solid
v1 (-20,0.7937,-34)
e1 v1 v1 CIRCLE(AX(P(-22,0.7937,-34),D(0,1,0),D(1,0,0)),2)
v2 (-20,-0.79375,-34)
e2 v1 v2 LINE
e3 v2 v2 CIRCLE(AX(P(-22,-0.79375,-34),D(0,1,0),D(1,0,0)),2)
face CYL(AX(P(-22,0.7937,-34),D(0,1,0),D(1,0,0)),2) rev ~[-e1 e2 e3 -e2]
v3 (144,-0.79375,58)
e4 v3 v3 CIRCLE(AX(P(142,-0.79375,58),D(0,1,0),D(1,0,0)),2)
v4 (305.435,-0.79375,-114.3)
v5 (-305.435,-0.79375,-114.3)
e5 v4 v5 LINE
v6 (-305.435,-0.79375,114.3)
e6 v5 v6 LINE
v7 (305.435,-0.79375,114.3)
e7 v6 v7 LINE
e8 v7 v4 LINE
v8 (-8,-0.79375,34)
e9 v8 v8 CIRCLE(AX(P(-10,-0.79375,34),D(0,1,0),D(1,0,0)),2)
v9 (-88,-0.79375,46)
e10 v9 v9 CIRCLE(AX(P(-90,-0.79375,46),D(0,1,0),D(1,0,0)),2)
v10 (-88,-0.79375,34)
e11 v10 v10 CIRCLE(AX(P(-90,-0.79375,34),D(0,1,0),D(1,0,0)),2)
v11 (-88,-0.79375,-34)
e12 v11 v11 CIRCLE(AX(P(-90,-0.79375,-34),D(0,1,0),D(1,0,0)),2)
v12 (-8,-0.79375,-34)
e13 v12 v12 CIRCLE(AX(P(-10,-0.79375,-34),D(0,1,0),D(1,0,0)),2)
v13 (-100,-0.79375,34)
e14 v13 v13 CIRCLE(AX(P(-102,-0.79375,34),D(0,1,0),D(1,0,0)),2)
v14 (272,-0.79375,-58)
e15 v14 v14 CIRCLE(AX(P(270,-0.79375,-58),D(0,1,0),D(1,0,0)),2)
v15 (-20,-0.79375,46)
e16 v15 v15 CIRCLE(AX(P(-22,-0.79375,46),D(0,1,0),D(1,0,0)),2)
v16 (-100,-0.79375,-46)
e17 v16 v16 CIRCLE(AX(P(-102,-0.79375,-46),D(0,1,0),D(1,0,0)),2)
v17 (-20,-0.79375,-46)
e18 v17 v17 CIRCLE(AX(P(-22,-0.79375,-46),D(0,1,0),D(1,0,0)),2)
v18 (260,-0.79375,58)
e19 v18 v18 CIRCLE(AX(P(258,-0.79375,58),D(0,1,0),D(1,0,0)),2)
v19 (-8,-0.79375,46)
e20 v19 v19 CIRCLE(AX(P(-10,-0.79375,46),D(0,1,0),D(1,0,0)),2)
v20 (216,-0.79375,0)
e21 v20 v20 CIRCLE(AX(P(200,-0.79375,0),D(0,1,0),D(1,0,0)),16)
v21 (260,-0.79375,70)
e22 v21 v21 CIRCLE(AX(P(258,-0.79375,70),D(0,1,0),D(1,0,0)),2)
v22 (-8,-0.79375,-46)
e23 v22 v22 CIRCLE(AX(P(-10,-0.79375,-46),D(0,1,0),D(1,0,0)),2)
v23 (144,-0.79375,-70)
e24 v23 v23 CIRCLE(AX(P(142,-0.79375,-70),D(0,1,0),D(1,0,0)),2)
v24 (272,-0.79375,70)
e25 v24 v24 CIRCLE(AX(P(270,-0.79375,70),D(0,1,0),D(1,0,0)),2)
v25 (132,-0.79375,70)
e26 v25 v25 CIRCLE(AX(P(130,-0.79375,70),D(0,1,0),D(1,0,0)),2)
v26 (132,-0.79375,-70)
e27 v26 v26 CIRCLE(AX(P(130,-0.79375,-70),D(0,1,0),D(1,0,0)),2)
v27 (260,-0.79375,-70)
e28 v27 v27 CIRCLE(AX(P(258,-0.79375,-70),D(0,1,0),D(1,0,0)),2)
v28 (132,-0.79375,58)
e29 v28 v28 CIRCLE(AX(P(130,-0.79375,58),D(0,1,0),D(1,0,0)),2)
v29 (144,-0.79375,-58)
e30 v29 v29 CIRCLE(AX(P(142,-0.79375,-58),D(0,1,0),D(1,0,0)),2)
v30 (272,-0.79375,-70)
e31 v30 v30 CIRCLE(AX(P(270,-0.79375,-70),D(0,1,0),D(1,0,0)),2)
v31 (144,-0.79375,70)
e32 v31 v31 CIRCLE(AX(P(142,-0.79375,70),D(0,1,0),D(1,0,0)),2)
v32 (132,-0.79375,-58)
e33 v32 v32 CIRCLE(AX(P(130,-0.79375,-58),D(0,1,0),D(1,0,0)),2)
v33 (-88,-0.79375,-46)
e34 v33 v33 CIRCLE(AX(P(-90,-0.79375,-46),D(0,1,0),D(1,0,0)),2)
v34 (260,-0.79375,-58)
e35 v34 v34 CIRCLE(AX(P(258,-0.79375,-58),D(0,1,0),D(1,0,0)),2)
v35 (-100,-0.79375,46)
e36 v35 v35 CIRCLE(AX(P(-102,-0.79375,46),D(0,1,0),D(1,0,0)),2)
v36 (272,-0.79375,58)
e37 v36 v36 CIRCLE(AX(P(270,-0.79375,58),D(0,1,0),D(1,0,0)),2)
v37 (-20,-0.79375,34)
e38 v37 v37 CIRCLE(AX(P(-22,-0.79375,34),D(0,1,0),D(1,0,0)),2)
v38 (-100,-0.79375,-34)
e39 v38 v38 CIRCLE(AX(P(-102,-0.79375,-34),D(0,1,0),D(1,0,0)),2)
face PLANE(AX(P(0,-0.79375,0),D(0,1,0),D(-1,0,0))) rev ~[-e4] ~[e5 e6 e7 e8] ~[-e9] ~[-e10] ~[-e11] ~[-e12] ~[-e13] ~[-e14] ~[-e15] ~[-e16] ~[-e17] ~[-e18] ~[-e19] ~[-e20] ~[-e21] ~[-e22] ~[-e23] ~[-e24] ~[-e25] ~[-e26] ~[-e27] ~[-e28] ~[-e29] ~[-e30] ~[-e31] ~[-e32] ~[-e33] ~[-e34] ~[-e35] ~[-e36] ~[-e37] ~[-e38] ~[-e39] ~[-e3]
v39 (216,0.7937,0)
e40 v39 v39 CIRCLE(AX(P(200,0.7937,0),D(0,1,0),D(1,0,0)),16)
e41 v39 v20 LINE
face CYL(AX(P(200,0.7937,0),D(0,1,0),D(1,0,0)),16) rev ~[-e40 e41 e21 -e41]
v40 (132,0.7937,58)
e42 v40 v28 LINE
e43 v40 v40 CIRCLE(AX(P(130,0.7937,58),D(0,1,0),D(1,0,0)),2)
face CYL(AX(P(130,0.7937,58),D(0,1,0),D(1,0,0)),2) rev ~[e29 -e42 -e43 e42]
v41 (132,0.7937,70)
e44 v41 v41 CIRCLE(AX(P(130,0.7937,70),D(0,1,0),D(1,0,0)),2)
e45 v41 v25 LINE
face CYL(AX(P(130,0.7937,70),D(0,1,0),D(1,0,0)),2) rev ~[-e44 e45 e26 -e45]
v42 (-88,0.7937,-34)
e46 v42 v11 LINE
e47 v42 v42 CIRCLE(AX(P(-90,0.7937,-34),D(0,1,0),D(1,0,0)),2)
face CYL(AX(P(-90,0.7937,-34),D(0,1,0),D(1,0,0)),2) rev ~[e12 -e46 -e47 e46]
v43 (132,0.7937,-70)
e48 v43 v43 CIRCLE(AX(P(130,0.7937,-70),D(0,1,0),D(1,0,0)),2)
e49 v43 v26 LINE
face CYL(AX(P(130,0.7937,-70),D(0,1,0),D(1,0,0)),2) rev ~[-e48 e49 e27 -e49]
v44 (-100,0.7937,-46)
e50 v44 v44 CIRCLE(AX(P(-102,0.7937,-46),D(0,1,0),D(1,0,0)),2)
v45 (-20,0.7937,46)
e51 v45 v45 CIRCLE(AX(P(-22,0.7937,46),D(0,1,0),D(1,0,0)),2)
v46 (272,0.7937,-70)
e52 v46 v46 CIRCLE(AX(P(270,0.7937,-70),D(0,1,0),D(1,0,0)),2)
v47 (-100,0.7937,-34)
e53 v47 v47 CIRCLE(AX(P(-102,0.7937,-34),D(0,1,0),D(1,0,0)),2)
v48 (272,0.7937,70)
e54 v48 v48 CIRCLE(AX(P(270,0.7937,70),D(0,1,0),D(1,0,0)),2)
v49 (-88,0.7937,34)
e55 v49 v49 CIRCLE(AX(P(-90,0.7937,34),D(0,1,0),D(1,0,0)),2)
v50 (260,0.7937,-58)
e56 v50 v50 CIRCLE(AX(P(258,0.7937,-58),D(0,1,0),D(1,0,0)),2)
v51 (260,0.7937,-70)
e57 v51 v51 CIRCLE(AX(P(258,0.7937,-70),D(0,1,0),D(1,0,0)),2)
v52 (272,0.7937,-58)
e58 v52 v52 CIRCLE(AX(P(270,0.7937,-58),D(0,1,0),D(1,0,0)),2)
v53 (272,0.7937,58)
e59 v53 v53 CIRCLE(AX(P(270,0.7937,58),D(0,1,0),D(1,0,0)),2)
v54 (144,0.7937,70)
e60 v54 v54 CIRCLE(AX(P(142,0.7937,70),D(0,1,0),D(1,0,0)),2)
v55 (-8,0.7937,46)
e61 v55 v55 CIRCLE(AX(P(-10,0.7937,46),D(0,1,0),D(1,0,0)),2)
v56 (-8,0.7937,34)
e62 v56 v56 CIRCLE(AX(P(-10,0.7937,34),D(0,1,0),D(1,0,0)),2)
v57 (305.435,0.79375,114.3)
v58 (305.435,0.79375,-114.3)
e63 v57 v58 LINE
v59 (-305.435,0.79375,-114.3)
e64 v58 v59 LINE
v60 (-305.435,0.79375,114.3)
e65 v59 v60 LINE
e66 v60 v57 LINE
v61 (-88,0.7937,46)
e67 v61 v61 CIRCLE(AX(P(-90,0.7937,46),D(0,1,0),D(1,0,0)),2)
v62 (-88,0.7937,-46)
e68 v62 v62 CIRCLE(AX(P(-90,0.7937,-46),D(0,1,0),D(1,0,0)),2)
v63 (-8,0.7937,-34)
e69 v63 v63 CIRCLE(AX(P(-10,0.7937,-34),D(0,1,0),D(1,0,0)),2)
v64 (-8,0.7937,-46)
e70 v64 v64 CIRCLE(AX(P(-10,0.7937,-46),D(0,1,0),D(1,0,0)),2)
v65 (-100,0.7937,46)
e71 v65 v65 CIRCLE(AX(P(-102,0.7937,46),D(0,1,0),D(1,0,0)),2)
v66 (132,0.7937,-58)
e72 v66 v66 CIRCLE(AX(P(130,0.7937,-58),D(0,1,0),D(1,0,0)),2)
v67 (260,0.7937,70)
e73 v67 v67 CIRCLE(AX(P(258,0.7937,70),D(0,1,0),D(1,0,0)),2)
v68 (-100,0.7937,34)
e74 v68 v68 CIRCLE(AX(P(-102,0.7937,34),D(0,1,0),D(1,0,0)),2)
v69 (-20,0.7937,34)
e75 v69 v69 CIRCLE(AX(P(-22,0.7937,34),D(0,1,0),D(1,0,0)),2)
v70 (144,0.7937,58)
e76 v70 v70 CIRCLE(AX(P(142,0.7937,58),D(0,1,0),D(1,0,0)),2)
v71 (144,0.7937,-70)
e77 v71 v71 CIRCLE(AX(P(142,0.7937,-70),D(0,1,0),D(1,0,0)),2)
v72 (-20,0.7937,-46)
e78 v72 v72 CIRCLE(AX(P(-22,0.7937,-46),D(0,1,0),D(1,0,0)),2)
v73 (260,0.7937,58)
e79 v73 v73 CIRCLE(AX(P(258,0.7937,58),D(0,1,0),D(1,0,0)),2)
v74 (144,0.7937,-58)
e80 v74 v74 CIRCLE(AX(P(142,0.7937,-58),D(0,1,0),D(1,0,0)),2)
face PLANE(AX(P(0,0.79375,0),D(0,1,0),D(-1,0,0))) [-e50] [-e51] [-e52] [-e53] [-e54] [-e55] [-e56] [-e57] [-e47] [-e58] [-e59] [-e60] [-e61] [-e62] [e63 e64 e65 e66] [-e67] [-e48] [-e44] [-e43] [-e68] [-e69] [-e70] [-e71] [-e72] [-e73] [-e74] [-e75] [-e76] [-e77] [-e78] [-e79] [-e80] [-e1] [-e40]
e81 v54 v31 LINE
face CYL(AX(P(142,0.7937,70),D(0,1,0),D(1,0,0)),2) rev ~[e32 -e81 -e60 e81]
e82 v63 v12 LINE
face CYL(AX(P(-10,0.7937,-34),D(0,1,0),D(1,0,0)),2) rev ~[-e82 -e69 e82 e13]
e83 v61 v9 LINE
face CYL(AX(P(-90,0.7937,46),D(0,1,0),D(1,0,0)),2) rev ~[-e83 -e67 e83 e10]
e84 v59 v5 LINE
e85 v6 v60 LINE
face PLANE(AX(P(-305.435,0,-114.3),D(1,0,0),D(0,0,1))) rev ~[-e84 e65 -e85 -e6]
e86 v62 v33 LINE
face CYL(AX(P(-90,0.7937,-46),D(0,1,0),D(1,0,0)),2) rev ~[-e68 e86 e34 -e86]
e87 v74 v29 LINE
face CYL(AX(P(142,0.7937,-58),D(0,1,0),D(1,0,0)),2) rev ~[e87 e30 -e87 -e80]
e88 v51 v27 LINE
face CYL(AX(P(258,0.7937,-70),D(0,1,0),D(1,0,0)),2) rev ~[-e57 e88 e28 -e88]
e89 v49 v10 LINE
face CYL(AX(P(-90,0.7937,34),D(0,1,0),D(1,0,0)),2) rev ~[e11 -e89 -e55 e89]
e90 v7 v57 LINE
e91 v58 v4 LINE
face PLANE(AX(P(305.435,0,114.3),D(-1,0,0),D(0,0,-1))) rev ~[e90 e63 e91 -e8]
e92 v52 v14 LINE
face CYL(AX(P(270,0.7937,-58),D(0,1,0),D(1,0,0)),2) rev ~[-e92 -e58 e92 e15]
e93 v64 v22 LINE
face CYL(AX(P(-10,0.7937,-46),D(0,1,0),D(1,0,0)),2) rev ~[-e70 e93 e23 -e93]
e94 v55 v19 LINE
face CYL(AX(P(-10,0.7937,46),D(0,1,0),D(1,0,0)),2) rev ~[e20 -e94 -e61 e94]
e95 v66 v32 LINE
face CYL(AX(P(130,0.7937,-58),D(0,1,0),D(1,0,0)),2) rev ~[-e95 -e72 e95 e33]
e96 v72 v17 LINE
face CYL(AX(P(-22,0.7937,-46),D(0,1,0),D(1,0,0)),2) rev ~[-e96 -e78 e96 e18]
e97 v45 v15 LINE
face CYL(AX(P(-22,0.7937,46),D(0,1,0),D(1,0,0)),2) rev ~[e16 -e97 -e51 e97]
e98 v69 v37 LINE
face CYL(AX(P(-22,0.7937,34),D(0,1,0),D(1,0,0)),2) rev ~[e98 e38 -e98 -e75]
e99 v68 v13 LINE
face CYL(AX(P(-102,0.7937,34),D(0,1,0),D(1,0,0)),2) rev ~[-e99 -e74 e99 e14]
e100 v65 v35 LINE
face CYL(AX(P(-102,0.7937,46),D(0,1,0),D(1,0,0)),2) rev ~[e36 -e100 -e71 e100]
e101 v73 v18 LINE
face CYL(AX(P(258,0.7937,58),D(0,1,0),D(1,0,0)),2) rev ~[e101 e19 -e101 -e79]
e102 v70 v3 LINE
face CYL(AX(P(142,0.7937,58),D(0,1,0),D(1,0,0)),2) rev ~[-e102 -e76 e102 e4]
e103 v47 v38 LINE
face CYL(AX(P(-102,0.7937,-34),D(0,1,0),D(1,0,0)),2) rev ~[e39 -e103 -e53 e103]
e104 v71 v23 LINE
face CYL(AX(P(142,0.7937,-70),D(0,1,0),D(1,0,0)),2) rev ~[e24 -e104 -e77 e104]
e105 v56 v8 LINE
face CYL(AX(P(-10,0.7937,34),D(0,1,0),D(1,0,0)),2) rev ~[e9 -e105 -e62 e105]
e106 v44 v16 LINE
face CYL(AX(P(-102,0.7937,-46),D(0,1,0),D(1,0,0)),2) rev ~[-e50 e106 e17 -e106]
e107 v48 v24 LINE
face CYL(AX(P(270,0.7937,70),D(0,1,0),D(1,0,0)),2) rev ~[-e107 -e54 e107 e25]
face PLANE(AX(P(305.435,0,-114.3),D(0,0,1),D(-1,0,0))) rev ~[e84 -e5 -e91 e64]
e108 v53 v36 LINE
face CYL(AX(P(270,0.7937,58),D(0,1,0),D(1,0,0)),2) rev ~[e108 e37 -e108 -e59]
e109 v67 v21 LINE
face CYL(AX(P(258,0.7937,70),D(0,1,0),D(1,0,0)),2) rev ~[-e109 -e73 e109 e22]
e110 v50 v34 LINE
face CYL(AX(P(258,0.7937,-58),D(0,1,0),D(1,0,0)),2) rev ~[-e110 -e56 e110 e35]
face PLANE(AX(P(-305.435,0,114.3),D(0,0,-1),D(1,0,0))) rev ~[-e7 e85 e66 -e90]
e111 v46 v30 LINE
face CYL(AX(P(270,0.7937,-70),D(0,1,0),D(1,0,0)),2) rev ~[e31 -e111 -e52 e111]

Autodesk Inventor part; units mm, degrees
ref_plane "YZ Plane" through (0, 0, 0) normal (1, 0, 0) x (0, 1, 0)
ref_plane "XZ Plane" through (0, 0, 0) normal (0, 1, 0) x (-1, 0, 0)
ref_plane "XY Plane" through (0, 0, 0) normal (0, 0, 1) x (1, 0, 0)
sketch "Sketch1" plane through (0, 0, 0) normal (0, 1, 0) x (-1, 0, 0)
  line L0 (305.435, 114.3) -> (-305.435, 114.3)
  line L1 (-305.435, 114.3) -> (-305.435, -114.3)
  line L2 (-305.435, -114.3) -> (305.435, -114.3)
  line L3 (305.435, -114.3) -> (305.435, 114.3)
  line L4 (305.435, 114.3) -> (-305.435, -114.3) construction
  line L5 (-305.435, 114.3) -> (305.435, -114.3) construction
  point P0 (0, 0)
  dimension "d0" = 610.87
  dimension "d1" = 228.6
extrude "Extrusion1" add sketch "Sketch1" along normal mid plane 1.5875
sketch "Sketch2" plane through (0, 0.7937, 0) normal (0, 1, 0) x (1, 0, 0)
  circle A0 centre (200, 0) radius 16
  circle A1 centre (264, -64) radius 2.5 construction
  circle A2 centre (270, -70) radius 2
  circle A3 centre (270, -58) radius 2
  circle A4 centre (258, -58) radius 2
  circle A5 centre (258, -70) radius 2
  circle A6 centre (258, 58) radius 2
  circle A7 centre (270, 58) radius 2
  circle A8 centre (270, 70) radius 2
  circle A9 centre (258, 70) radius 2
  circle A10 centre (142, 58) radius 2
  circle A11 centre (142, 70) radius 2
  circle A12 centre (130, 70) radius 2
  circle A13 centre (130, 58) radius 2
  circle A14 centre (142, -58) radius 2
  circle A15 centre (130, -58) radius 2
  circle A16 centre (130, -70) radius 2
  circle A17 centre (142, -70) radius 2
  point P0 (0, 0)
  dimension "d4" = 32
  dimension "d5" = 200
  dimension "d6" = 5
  dimension "d7" = 64
  dimension "d8" = 64
  dimension "d11" = 4
  dimension "d12" = 6
  dimension "d13" = 6
  dimension "d16" = 360
  dimension "d20" = 360
extrude "Extrusion2" cut sketch "Sketch2" against normal through all
sketch "Sketch3" plane through (0, 0.7937, 0) normal (0, 1, 0) x (1, 0, 0)
  circle A0 centre (-56, 0) radius 7 construction
  circle A1 centre (200, 0) radius 16 construction
  circle A2 centre (-96, -40) radius 2.5 construction
  circle A3 centre (-90, -34) radius 2
  circle A4 centre (-102, -34) radius 2
  circle A5 centre (-102, -46) radius 2
  circle A6 centre (-90, -46) radius 2
  circle A7 centre (-22, -46) radius 2
  circle A8 centre (-22, -34) radius 2
  circle A9 centre (-10, -46) radius 2
  circle A10 centre (-10, -34) radius 2
  circle A11 centre (-10, 34) radius 2
  circle A12 centre (-22, 34) radius 2
  circle A13 centre (-10, 46) radius 2
  circle A14 centre (-22, 46) radius 2
  circle A15 centre (-90, 46) radius 2
  circle A16 centre (-90, 34) radius 2
  circle A17 centre (-102, 46) radius 2
  circle A18 centre (-102, 34) radius 2
  point P0 (0, 0)
  dimension "d24" = 14
  dimension "d25" = 256
  dimension "d42" = 5
  dimension "d43" = 40
  dimension "d44" = 40
  dimension "d45" = 4
  dimension "d46" = 6
  dimension "d47" = 6
  dimension "d50" = 360
  dimension "d54" = 360
extrude "Extrusion4" cut sketch "Sketch3" against normal through all
properties part number "ChassisTop"
